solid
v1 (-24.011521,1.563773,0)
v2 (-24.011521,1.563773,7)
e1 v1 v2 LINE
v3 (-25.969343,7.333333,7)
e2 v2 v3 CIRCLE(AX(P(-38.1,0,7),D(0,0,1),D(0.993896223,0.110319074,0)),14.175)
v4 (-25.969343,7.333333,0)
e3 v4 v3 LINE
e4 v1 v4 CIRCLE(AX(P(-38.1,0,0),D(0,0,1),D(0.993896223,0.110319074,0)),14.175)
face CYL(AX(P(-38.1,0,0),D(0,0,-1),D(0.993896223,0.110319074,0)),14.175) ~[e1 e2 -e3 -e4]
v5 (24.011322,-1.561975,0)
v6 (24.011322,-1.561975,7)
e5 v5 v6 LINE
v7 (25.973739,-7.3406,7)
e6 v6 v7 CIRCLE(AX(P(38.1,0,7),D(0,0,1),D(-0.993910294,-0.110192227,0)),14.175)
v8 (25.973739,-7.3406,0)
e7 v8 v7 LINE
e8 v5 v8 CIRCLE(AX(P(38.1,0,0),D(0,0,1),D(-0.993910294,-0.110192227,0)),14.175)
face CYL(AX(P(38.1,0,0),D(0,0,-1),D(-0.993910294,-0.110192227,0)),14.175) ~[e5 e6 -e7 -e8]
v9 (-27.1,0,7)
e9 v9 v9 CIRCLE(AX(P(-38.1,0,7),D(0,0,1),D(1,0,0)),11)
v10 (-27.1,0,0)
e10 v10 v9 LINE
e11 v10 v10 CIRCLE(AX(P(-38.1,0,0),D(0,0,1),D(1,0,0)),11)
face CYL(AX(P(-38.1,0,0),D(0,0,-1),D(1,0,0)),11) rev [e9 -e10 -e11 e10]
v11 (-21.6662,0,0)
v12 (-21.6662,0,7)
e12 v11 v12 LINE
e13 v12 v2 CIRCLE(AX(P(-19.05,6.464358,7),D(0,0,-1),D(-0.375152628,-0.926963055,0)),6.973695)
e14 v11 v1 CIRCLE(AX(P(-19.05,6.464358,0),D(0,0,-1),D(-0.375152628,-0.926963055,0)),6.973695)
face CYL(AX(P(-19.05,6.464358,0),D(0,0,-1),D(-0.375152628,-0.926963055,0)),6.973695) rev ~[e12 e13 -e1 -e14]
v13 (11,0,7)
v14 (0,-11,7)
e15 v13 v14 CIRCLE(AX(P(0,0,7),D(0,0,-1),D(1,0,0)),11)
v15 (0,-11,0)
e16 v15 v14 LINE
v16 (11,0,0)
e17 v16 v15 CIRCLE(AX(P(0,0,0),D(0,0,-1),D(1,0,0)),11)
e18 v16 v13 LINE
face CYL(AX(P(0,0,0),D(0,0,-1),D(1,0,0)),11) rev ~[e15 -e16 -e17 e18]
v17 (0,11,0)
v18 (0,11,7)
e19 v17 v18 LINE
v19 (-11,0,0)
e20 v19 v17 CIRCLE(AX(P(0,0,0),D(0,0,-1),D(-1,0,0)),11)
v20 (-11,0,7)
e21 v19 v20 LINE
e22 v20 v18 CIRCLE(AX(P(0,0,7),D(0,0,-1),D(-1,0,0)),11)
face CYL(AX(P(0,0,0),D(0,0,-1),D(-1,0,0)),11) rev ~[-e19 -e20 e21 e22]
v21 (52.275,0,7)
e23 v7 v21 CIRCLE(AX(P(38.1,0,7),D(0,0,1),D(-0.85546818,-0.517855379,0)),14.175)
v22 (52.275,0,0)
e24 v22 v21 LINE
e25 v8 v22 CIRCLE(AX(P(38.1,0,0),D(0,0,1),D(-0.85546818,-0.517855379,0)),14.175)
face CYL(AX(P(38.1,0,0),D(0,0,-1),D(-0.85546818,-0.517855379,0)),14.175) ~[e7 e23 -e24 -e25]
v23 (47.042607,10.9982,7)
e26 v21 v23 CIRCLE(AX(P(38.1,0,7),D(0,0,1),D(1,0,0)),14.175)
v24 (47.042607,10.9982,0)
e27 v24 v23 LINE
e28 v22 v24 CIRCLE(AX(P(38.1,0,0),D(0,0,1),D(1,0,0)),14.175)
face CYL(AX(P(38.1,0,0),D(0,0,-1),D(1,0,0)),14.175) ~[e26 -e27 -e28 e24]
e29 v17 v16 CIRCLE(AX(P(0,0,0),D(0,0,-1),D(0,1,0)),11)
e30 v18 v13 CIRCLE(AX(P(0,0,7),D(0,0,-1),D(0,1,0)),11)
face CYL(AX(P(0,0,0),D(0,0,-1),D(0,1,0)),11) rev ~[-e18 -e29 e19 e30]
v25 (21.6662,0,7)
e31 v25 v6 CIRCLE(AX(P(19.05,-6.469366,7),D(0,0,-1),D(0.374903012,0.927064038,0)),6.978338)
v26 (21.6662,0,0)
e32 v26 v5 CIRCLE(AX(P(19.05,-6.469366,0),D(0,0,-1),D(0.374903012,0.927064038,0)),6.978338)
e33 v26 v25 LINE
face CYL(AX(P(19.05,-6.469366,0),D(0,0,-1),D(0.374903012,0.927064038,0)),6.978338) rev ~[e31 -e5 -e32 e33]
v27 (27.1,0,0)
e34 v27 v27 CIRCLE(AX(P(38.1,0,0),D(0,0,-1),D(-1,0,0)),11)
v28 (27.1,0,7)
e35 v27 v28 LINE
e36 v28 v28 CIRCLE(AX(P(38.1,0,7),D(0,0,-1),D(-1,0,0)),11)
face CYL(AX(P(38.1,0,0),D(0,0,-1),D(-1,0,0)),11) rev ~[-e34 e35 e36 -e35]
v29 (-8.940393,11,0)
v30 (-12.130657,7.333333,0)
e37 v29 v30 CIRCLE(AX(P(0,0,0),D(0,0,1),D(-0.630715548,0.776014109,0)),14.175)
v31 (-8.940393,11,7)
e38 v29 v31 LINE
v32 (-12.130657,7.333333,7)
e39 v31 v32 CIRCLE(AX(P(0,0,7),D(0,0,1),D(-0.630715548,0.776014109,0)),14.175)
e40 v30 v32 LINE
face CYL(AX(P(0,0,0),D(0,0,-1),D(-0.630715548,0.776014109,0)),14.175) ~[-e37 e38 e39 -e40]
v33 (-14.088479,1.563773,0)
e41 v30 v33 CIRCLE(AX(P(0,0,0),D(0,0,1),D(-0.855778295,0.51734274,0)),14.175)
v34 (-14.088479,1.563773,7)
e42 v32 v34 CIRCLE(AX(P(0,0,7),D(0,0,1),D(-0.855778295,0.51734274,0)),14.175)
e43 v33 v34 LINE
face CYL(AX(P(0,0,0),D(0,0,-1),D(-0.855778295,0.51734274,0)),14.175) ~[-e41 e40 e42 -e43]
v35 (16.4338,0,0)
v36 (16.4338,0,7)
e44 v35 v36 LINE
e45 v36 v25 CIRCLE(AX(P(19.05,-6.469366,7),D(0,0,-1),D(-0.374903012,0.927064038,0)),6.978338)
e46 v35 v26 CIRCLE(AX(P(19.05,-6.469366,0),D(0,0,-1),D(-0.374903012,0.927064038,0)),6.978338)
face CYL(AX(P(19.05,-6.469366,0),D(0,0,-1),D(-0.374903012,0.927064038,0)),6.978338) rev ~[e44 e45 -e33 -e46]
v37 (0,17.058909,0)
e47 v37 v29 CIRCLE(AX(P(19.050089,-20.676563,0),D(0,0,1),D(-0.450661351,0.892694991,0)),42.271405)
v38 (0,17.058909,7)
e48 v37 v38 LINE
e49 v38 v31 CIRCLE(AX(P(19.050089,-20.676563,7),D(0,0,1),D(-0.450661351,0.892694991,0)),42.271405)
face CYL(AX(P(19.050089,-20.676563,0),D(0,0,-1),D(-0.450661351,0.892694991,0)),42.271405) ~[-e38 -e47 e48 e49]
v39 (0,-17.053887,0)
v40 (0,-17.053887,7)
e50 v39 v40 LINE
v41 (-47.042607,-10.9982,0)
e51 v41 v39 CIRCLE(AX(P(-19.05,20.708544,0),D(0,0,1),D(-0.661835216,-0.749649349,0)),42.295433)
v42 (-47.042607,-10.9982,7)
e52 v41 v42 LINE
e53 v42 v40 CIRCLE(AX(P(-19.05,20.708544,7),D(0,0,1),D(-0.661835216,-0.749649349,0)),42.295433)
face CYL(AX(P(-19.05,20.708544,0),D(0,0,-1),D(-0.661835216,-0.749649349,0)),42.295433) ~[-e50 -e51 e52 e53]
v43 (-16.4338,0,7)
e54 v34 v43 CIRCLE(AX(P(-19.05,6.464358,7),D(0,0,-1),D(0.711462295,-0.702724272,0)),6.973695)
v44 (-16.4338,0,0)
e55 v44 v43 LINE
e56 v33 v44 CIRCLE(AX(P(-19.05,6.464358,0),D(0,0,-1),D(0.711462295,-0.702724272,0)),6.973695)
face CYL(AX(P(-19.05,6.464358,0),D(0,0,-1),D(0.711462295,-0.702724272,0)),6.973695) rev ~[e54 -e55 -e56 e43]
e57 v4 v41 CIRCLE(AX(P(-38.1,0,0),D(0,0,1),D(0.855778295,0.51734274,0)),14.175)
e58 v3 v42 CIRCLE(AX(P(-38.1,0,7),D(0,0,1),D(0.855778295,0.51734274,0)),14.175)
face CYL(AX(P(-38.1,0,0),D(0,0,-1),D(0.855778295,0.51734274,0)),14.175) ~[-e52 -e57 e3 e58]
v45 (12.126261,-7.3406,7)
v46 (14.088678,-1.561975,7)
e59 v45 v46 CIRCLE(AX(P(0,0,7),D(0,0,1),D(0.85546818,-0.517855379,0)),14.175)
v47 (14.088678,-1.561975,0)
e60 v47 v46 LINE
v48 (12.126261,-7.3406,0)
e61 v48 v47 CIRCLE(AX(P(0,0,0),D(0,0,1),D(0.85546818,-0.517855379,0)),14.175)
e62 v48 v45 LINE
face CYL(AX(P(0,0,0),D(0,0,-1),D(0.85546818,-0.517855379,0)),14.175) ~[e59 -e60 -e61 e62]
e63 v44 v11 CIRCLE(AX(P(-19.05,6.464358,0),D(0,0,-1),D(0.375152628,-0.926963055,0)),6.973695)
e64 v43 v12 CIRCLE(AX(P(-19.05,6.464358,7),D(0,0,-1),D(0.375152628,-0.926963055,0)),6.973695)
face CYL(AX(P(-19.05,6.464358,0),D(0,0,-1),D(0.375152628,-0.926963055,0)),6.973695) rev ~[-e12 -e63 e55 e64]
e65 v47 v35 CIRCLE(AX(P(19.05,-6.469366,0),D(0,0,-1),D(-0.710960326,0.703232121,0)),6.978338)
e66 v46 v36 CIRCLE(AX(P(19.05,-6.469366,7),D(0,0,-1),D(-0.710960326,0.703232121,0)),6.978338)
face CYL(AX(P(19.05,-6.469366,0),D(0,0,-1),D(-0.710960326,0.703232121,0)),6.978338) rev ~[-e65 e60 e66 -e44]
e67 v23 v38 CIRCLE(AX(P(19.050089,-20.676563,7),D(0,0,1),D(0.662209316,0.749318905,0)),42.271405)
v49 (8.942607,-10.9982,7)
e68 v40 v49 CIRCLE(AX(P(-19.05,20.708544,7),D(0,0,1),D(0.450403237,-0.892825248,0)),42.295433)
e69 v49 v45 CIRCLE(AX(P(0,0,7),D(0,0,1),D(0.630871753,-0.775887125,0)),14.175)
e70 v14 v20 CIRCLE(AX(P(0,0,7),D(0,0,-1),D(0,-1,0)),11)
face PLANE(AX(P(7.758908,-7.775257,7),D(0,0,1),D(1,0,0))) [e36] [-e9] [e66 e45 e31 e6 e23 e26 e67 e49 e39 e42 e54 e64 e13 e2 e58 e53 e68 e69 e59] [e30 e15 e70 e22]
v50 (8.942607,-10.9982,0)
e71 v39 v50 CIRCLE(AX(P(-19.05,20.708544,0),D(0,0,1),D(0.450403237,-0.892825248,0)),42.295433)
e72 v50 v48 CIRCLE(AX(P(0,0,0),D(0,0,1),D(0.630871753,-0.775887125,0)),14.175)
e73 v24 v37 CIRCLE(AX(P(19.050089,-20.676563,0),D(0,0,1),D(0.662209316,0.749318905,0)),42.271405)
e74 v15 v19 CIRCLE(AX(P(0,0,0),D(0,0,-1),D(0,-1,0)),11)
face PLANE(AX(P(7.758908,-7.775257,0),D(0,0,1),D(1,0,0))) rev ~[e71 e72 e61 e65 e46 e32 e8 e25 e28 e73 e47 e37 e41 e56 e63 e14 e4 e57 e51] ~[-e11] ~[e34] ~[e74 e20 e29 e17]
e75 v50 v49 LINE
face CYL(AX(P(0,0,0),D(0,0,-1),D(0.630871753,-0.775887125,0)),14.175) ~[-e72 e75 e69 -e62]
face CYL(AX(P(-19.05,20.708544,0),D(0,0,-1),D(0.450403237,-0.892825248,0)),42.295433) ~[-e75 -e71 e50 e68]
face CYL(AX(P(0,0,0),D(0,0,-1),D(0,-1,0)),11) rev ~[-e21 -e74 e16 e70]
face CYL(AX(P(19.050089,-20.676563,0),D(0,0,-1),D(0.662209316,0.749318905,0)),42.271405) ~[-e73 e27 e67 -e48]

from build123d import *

# Parameters (mm, degrees)
F0_R     = 11
F1_DEPTH = 7


# Not quite as in the source:
# - a feature names something its author has since deleted; it is built from what else it names


with BuildPart() as f1:
    # F0 (on Top) → F1 (new body)
    with BuildSketch(Plane.XY):
        with BuildLine():
            Line((14.175, 0), (11, 0))
            ThreePointArc((11, 0), (7.7781745931, -7.7781745931), (0, -11))
            Line((0, -11), (0, -14.175))
            ThreePointArc((0, -14.175), (4.7450574285, -13.3572098509), (8.9426071008, -10.9982))
            ThreePointArc((8.9426071008, -10.9982), (10.6919977036, -9.3065466262), (12.1262614453, -7.3406))
            ThreePointArc((12.1262614453, -7.3406), (12.4422930723, -4.2253938225), (14.0886784217, -1.561974817))
            ThreePointArc((14.0886784217, -1.561974817), (14.1534031531, -0.7821791265), (14.175, 0))
        make_face()
        with BuildLine():
            ThreePointArc((0, 11), (7.7781745931, 7.7781745931), (11, 0))
            Line((11, 0), (14.175, 0))
            ThreePointArc((14.175, 0), (10.0232386233, 10.0232386233), (0, 14.175))
            Line((0, 14.175), (0, 11))
        make_face()
        with BuildLine():
            ThreePointArc((-11, 0), (-7.7781745931, 7.7781745931), (0, 11))
            Line((0, 11), (0, 14.175))
            ThreePointArc((0, 14.175), (-4.7437129445, 13.3576873934), (-8.9403928885, 11))
            ThreePointArc((-8.9403928885, 11), (-10.6938487189, 9.304419626), (-12.1306573285, 7.3333333333))
            ThreePointArc((-12.1306573285, 7.3333333333), (-12.4461611466, 4.2234349909), (-14.0884789594, 1.5637728768))
            ThreePointArc((-14.0884789594, 1.5637728768), (-14.1533532113, 0.7830822914), (-14.175, 0))
            Line((-14.175, 0), (-11, 0))
        make_face()
        with BuildLine():
            Line((0, -14.175), (0, -11))
            ThreePointArc((0, -11), (-7.7781745931, -7.7781745931), (-11, 0))
            Line((-11, 0), (-14.175, 0))
            ThreePointArc((-14.175, 0), (-10.0232386233, -10.0232386233), (0, -14.175))
        make_face()
        with BuildLine():
            ThreePointArc((0, 14.175), (10.0232386233, 10.0232386233), (14.175, 0))
            Line((14.175, 0), (16.4338, 0))
            ThreePointArc((16.4338, 0), (19.05, 0.5089718042), (21.6662, 0))
            Line((21.6662, 0), (23.925, 0))
            ThreePointArc((23.925, 0), (32.0102886216, 12.8002359481), (47.0426071008, 10.9982))
            ThreePointArc((47.0426071008, 10.9982), (24.4514597735, 21.2483327836), (0, 17.0589086472))
            Line((0, 17.0589086472), (0, 14.175))
        make_face()
        with BuildLine():
            Line((16.4338, 0), (14.175, 0))
            ThreePointArc((14.175, 0), (14.1534031531, -0.7821791265), (14.0886784217, -1.561974817))
            ThreePointArc((14.0886784217, -1.561974817), (15.1815830564, -0.6613930561), (16.4338, 0))
        make_face()
        with BuildLine():
            ThreePointArc((-8.9403928885, 11), (-4.7437129445, 13.3576873934), (0, 14.175))
            Line((0, 14.175), (0, 17.0589086472))
            ThreePointArc((0, 17.0589086472), (-4.6644934549, 14.3161547368), (-8.9403928885, 11))
        make_face()
        with BuildLine():
            Line((0, -17.0538866478), (0, -14.175))
            ThreePointArc((0, -14.175), (-10.0232386233, -10.0232386233), (-14.175, 0))
            Line((-14.175, 0), (-16.4338, 0))
            ThreePointArc((-16.4338, 0), (-19.05, -0.5093373751), (-21.6662, 0))
            Line((-21.6662, 0), (-23.925, 0))
            ThreePointArc((-23.925, 0), (-32.0102886216, -12.8002359481), (-47.0426071008, -10.9982))
            ThreePointArc((-47.0426071008, -10.9982), (-24.4500361697, -21.2407501362), (0, -17.0538866478))
        make_face()
        with BuildLine():
            ThreePointArc((8.9426071008, -10.9982), (4.7450574285, -13.3572098509), (0, -14.175))
            Line((0, -14.175), (0, -17.0538866478))
            ThreePointArc((0, -17.0538866478), (4.6653864802, -14.3126511831), (8.9426071008, -10.9982))
        make_face()
        with BuildLine():
            ThreePointArc((12.1262614453, -7.3406), (13.4221419792, -4.55814981), (14.0886784217, -1.561974817))
            ThreePointArc((14.0886784217, -1.561974817), (12.4422930723, -4.2253938225), (12.1262614453, -7.3406))
        make_face()
        with BuildLine():
            Line((-16.4338, 0), (-14.175, 0))
            ThreePointArc((-14.175, 0), (-14.1533532113, 0.7830822914), (-14.0884789594, 1.5637728768))
            ThreePointArc((-14.0884789594, 1.5637728768), (-15.1813037797, 0.6621501584), (-16.4338, 0))
        make_face()
        with BuildLine():
            Line((23.925, 0), (21.6662, 0))
            ThreePointArc((21.6662, 0), (22.9184169436, -0.6613930561), (24.0113215783, -1.561974817))
            ThreePointArc((24.0113215783, -1.561974817), (23.9465968469, -0.7821791265), (23.925, 0))
        make_face()
        with BuildLine():
            ThreePointArc((-12.1306573285, 7.3333333333), (-13.4232162274, 4.5549853033), (-14.0884789594, 1.5637728768))
            ThreePointArc((-14.0884789594, 1.5637728768), (-12.4461611466, 4.2234349909), (-12.1306573285, 7.3333333333))
        make_face()
        with BuildLine():
            ThreePointArc((52.275, 0), (50.9002359481, 6.0897113784), (47.0426071008, 10.9982))
            ThreePointArc((47.0426071008, 10.9982), (32.0102886216, 12.8002359481), (23.925, 0))
            ThreePointArc((23.925, 0), (23.9465968469, -0.7821791265), (24.0113215783, -1.561974817))
            ThreePointArc((24.0113215783, -1.561974817), (25.6577069277, -4.2253938225), (25.9737385547, -7.3406))
            ThreePointArc((25.9737385547, -7.3406), (41.9105687904, -13.6532117281), (52.275, 0))
        make_face()
        with BuildLine():
            ThreePointArc((49.1, 0), (38.1, -11), (27.1, 0))
            ThreePointArc((27.1, 0), (38.1, 11), (49.1, 0))
        make_face(mode=Mode.SUBTRACT)
        with BuildLine():
            ThreePointArc((-25.9693426715, 7.3333333333), (-47.4033431975, 10.6947851941), (-47.0426071008, -10.9982))
            ThreePointArc((-47.0426071008, -10.9982), (-32.0102886216, -12.8002359481), (-23.925, 0))
            ThreePointArc((-23.925, 0), (-23.9466467887, 0.7830822914), (-24.0115210406, 1.5637728768))
            ThreePointArc((-24.0115210406, 1.5637728768), (-25.6538388534, 4.2234349909), (-25.9693426715, 7.3333333333))
        make_face()
        with Locations((-38.1, 0)):
            Circle(F0_R, mode=Mode.SUBTRACT)
        with BuildLine():
            ThreePointArc((25.9737385547, -7.3406), (25.6577069277, -4.2253938225), (24.0113215783, -1.561974817))
            ThreePointArc((24.0113215783, -1.561974817), (24.6778580208, -4.55814981), (25.9737385547, -7.3406))
        make_face()
        with BuildLine():
            Line((-23.925, 0), (-21.6662, 0))
            ThreePointArc((-21.6662, 0), (-22.9186962203, 0.6621501584), (-24.0115210406, 1.5637728768))
            ThreePointArc((-24.0115210406, 1.5637728768), (-23.9466467887, 0.7830822914), (-23.925, 0))
        make_face()
        with BuildLine():
            ThreePointArc((-24.0115210406, 1.5637728768), (-24.6767837726, 4.5549853033), (-25.9693426715, 7.3333333333))
            ThreePointArc((-25.9693426715, 7.3333333333), (-25.6538388534, 4.2234349909), (-24.0115210406, 1.5637728768))
        make_face()
    extrude(amount=F1_DEPTH)


solid = f1.part
